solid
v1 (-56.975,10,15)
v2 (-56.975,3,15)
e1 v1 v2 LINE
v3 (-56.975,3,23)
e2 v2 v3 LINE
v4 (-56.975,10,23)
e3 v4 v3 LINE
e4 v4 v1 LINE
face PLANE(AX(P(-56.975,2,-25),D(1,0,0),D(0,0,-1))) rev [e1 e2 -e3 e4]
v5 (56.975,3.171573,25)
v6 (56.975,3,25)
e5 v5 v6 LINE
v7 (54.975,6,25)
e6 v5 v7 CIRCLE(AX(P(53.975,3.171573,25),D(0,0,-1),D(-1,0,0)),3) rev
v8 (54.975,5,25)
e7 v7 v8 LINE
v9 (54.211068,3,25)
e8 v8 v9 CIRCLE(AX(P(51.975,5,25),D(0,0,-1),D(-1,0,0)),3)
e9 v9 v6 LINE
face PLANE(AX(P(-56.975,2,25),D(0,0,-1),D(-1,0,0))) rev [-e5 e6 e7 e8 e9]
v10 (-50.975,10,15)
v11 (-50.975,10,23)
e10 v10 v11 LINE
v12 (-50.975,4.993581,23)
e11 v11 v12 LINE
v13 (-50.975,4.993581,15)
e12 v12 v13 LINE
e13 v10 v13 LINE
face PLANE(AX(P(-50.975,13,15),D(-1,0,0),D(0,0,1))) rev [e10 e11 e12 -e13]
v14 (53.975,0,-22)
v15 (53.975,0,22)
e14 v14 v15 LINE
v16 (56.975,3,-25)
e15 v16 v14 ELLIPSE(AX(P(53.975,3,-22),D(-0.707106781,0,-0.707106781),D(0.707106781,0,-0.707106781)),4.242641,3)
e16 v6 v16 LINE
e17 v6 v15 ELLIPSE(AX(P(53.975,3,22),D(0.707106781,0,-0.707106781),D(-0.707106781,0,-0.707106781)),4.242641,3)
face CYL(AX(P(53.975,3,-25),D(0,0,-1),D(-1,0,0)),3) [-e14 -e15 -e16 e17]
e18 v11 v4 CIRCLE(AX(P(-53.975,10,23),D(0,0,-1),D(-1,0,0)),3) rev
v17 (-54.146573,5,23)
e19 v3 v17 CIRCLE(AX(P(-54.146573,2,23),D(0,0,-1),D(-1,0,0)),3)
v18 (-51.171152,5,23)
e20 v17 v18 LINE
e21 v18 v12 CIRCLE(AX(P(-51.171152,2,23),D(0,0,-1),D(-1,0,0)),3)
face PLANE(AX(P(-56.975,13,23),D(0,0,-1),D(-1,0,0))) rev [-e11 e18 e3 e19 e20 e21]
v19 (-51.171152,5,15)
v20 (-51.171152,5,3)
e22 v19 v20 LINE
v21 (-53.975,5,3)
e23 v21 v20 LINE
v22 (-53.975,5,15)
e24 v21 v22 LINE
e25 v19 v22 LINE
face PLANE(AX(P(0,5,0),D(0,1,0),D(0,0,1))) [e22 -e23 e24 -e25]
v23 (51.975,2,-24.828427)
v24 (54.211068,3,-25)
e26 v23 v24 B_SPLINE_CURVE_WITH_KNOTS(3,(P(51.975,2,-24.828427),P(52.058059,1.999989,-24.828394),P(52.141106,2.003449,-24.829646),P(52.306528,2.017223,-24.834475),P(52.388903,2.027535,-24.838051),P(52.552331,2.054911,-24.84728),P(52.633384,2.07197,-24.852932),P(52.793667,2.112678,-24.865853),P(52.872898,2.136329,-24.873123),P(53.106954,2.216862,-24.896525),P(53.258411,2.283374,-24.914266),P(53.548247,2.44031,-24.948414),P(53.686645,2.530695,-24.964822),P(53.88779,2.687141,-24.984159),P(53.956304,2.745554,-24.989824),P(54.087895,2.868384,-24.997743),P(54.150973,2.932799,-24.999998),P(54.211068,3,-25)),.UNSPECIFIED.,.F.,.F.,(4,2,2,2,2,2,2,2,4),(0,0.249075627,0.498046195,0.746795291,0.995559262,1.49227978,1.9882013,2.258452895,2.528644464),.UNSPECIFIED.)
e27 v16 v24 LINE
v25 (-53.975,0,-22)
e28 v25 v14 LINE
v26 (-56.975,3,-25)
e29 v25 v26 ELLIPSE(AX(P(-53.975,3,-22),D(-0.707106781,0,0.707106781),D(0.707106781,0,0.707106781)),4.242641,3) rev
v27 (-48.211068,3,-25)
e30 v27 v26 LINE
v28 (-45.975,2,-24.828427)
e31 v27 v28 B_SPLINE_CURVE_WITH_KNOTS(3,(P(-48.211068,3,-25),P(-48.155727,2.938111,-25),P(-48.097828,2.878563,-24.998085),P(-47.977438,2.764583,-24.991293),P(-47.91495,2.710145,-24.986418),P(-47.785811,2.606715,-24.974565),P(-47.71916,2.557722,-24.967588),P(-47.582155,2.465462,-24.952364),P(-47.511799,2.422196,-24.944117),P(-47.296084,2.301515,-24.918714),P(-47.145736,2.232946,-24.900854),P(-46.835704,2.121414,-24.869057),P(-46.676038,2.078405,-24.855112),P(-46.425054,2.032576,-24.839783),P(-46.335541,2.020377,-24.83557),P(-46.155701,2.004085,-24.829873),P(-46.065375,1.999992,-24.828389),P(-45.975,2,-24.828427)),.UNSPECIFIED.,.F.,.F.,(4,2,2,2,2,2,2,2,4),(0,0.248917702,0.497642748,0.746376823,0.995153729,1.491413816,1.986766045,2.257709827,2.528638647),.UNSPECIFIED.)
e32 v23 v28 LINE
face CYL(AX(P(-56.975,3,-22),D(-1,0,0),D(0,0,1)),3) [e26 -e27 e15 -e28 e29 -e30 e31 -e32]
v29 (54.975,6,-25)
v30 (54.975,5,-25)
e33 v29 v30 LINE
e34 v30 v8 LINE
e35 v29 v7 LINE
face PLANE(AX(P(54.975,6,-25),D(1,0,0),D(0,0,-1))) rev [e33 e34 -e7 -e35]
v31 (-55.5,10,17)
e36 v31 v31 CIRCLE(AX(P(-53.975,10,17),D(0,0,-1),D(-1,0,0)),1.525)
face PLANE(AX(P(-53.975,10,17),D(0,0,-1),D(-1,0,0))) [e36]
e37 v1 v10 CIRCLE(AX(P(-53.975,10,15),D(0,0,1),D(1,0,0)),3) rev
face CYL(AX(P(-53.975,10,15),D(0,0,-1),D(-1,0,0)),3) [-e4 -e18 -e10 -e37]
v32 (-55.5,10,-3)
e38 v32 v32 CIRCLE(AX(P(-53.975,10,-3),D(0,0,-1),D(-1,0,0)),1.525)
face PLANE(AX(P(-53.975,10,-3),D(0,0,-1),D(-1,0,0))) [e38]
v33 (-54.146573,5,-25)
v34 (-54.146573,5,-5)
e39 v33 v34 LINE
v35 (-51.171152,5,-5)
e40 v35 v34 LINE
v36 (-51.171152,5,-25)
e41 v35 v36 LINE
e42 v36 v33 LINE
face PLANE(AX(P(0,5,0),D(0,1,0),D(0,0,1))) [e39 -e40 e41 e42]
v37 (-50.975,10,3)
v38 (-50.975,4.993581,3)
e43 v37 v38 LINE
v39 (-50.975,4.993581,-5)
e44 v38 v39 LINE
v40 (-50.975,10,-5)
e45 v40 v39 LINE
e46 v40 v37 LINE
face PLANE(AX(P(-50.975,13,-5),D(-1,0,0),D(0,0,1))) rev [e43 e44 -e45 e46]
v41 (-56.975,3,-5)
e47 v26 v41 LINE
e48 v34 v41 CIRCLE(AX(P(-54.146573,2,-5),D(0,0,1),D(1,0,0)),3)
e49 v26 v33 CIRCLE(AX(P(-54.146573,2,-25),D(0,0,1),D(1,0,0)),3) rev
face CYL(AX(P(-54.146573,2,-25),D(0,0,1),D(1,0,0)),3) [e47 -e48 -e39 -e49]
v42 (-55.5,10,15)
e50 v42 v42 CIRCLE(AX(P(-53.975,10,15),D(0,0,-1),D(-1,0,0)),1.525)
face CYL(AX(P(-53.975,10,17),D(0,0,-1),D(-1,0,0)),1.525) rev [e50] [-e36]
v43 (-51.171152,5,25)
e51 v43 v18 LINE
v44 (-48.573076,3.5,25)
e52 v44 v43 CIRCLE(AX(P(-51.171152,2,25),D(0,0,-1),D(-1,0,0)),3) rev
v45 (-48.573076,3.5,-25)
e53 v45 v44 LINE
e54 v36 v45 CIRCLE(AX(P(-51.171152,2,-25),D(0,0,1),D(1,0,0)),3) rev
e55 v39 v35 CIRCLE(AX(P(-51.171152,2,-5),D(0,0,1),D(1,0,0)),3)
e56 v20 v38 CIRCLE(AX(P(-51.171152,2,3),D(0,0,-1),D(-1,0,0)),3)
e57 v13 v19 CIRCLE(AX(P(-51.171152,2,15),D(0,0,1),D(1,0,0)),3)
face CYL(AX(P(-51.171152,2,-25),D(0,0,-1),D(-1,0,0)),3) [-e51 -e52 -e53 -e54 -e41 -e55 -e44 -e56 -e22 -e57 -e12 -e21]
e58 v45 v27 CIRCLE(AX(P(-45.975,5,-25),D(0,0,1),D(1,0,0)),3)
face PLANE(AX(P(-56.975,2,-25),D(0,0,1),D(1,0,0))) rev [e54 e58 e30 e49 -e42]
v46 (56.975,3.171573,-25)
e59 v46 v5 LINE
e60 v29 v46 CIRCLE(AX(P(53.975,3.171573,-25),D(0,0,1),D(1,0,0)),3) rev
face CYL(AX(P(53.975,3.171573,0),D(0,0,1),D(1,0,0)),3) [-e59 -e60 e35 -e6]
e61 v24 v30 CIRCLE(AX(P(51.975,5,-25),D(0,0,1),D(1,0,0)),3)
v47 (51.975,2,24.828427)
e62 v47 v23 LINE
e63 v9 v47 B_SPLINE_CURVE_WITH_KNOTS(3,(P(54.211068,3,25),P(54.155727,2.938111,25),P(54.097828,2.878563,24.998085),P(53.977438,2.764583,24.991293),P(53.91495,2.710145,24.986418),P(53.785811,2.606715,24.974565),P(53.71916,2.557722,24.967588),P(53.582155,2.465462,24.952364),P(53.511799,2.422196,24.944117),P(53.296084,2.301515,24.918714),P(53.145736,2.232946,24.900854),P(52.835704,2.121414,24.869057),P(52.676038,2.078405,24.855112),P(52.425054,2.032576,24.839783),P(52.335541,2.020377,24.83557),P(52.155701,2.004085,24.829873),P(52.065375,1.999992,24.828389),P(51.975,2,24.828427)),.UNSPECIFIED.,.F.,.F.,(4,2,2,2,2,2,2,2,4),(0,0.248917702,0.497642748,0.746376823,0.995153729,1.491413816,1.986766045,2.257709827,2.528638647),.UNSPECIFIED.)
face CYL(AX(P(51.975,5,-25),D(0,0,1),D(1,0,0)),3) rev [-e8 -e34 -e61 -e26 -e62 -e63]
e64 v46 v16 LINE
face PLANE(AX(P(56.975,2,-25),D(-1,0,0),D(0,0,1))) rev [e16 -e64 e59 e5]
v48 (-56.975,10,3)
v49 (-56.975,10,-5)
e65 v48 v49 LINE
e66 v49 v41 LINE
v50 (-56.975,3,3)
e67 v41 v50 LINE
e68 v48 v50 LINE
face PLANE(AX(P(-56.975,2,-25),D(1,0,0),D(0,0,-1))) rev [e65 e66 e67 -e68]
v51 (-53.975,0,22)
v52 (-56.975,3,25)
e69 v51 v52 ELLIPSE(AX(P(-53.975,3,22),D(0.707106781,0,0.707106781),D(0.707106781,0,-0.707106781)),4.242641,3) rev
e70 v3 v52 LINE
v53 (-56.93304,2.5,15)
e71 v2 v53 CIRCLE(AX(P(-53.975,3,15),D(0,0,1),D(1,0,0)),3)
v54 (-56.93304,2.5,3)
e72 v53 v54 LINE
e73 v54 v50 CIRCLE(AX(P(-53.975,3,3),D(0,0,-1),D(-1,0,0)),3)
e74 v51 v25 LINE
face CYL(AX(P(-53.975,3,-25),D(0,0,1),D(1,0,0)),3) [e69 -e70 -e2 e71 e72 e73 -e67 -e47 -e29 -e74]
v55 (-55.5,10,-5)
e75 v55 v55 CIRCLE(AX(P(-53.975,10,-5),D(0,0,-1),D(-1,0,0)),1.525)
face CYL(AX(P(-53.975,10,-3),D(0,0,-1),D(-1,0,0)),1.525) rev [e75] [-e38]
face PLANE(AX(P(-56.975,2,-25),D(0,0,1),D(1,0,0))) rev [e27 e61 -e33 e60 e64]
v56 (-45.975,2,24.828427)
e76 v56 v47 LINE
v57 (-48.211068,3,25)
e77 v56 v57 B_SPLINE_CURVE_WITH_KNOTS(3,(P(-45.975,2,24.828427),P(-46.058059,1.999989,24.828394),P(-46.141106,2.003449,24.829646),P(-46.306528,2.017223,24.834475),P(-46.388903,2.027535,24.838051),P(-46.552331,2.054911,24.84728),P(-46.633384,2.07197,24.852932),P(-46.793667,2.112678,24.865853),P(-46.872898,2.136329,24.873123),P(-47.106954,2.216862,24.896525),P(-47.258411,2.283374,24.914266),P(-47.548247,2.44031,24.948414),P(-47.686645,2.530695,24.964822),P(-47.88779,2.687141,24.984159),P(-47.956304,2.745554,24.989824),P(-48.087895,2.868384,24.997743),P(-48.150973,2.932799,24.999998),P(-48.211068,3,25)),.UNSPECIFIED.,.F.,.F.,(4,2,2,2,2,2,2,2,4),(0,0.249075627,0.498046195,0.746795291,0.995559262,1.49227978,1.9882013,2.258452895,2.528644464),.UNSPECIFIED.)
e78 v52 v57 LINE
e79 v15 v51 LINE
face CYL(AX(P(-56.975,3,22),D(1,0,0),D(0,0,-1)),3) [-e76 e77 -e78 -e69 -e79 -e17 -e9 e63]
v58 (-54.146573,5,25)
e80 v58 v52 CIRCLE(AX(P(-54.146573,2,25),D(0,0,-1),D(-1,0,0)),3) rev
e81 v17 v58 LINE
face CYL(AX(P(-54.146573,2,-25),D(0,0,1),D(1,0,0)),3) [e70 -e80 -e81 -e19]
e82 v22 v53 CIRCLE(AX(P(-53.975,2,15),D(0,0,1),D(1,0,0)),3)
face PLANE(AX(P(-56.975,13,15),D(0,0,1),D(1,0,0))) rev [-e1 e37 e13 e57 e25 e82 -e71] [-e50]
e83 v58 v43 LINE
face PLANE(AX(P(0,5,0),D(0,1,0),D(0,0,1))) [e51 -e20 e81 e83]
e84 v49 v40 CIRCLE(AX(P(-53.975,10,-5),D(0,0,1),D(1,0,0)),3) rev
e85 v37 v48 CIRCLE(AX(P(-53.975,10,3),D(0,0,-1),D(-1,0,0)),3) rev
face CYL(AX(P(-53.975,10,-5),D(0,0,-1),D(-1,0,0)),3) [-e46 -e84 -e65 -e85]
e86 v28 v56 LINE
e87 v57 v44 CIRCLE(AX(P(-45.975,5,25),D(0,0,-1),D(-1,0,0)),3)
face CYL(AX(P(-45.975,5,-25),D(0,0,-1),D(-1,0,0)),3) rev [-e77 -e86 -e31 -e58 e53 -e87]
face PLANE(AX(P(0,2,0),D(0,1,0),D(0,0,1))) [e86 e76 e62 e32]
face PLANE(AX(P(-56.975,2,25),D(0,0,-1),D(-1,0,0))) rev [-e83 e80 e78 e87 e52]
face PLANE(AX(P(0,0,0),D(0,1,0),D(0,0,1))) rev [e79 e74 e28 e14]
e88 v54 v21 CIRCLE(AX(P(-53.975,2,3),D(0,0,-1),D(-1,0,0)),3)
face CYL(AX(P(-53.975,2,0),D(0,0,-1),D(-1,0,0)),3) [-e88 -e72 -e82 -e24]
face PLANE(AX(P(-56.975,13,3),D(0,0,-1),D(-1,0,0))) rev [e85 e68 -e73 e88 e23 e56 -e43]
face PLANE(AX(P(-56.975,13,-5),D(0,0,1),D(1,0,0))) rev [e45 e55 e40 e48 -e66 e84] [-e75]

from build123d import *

# Parameters (mm, degrees)
SKETCH1_W                     = 113.95
SKETCH1_H                     = 50
BOSS_EXTRUDE1_DEPTH           = 2
SKETCH2_W                     = 8
SKETCH2_H                     = 50
BOSS_EXTRUDE2_DEPTH           = 3
SKETCH3_W                     = 2
SKETCH3_H                     = 50
BOSS_EXTRUDE3_DEPTH           = 4
SKETCH7_W                     = 6
SKETCH7_H                     = 8
BOSS_EXTRUDE5_DEPTH           = 8
FILLET1_RADIUS                = 3
FILLET1_LENGTH                = 8
SKETCH10_R                    = 1.525
CUT_EXTRUDE2_DEPTH            = 2
LPATTERN2_COUNT               = 2
LPATTERN2_PITCH               = 20
FILLET1_OF_LPATTERN2_2_RADIUS = 3
FILLET1_OF_LPATTERN2_2_LENGTH = 8
FILLET2_R                     = 3
FILLET3_R                     = 3
FILLET4_START                 = -25
FILLET4_DEPTH                 = 20
FILLET4_START_2               = 3
FILLET4_2_DEPTH               = 12
FILLET4_START_3               = -19.719
FILLET4_3_DEPTH               = 44.719
FILLET4_START_4               = 23
FILLET4_4_DEPTH               = 2
FILLET5_R                     = 3


with BuildPart() as part:
    # Sketch1 → Boss-Extrude1 (new body)
    with BuildSketch(Plane(origin=(0, 0, 0), x_dir=(1, 0, 0), z_dir=(0, 1, 0))):
        Rectangle(SKETCH1_W, SKETCH1_H)
    extrude(amount=BOSS_EXTRUDE1_DEPTH)

    # Sketch2 → Boss-Extrude2 (add)
    with BuildSketch(Plane(origin=(0, 2, 0), x_dir=(1, 0, 0), z_dir=(0, 1, 0))):
        with Locations((-52.975, 0)):
            Rectangle(SKETCH2_W, SKETCH2_H)
    extrude(amount=BOSS_EXTRUDE2_DEPTH)

    # Sketch3 → Boss-Extrude3 (add)
    with BuildSketch(Plane(origin=(0, 2, 0), x_dir=(1, 0, 0), z_dir=(0, 1, 0))):
        with Locations((55.975, 0)):
            Rectangle(SKETCH3_W, SKETCH3_H)
    extrude(amount=BOSS_EXTRUDE3_DEPTH)

    # Sketch7 → Boss-Extrude5 (add)
    with BuildSketch(Plane(origin=(0, 5, 0), x_dir=(1, 0, 0), z_dir=(0, 1, 0))):
        with Locations((-53.975, 1)):
            Rectangle(SKETCH7_W, SKETCH7_H)
    boss_extrude5 = extrude(amount=BOSS_EXTRUDE5_DEPTH)

    # Fillet1: full round fillet: the end face becomes a half cylinder, R = half its width
    fillet1_face = Plane((-53.975, 13, -1), x_dir=(0, 0, 1), z_dir=(0, 1, 0))  # on the end face: x along it, z out of the body
    fillet1_slab = fillet1_face.offset(-FILLET1_RADIUS / 2) * Box(FILLET1_LENGTH, 2 * FILLET1_RADIUS, FILLET1_RADIUS, mode=Mode.PRIVATE)  # the body's end, R deep
    fillet1_round = Plane((-53.975, 10, -1), x_dir=(0, 1, 0), z_dir=(0, 0, 1)) * Cylinder(FILLET1_RADIUS, FILLET1_LENGTH, mode=Mode.PRIVATE)  # its axis R under the face
    add(fillet1_slab - fillet1_round, mode=Mode.SUBTRACT)

    # Sketch10 → Cut-Extrude2 (cut)
    with BuildSketch(Plane(origin=(0, 0, -5), x_dir=(-1, 0, 0), z_dir=(0, 0, -1))):
        with Locations((53.975, 10)):
            Circle(SKETCH10_R)
    cut_extrude2 = extrude(amount=-CUT_EXTRUDE2_DEPTH, mode=Mode.SUBTRACT)

    # LPattern2: Boss-Extrude5, Cut-Extrude2 ×2
    with Locations(*[(0, 0, i * LPATTERN2_PITCH) for i in range(1, LPATTERN2_COUNT)]):
        add(boss_extrude5)
        add(cut_extrude2, mode=Mode.SUBTRACT)

    # Fillet1 of LPattern2 2: full round fillet: the end face becomes a half cylinder, R = half its width
    fillet1_of_lpattern2_2_face = Plane((-53.975, 13, 19), x_dir=(0, 0, 1), z_dir=(0, 1, 0))  # on the end face: x along it, z out of the body
    fillet1_of_lpattern2_2_slab = fillet1_of_lpattern2_2_face.offset(-FILLET1_OF_LPATTERN2_2_RADIUS / 2) * Box(FILLET1_OF_LPATTERN2_2_LENGTH, 2 * FILLET1_OF_LPATTERN2_2_RADIUS, FILLET1_OF_LPATTERN2_2_RADIUS, mode=Mode.PRIVATE)  # the body's end, R deep
    fillet1_of_lpattern2_2_round = Plane((-53.975, 10, 19), x_dir=(0, 1, 0), z_dir=(0, 0, 1)) * Cylinder(FILLET1_OF_LPATTERN2_2_RADIUS, FILLET1_OF_LPATTERN2_2_LENGTH, mode=Mode.PRIVATE)  # its axis R under the face
    add(fillet1_of_lpattern2_2_slab - fillet1_of_lpattern2_2_round, mode=Mode.SUBTRACT)

    # Fillet2
    # the kernel refuses this fillet: 3 mm, written as the material it takes off along each edge
    with BuildSketch(Plane(origin=(-64.475, 0, -25), x_dir=(0, 1, 0), z_dir=(1, 0, 0))) as fillet2_piece_1:
        with BuildLine():
            CenterArc((FILLET2_R, FILLET2_R), FILLET2_R, 180, 90)
            Line((0, FILLET2_R), (0, 0))
            Line((0, 0), (FILLET2_R, 0))
        make_face()
    extrude(amount=128.95, mode=Mode.SUBTRACT)
    with BuildSketch(Plane(origin=(-56.975, 0, 32.5), x_dir=(1, 0, 0), z_dir=(0, 0, -1)), Plane(origin=(56.975, 0, -32.5), x_dir=(-1, 0, 0), z_dir=(0, 0, 1))) as fillet2_piece_2:
        with BuildLine():
            CenterArc((FILLET2_R, -FILLET2_R), FILLET2_R, 90, 90)
            Line((0, -FILLET2_R), (0, 0))
            Line((0, 0), (FILLET2_R, 0))
        make_face()
    extrude(amount=65, mode=Mode.SUBTRACT)
    with BuildSketch(Plane(origin=(64.475, 0, 25), x_dir=(0, 0, -1), z_dir=(-1, 0, 0))) as fillet2_piece_3:
        with BuildLine():
            CenterArc((FILLET2_R, -FILLET2_R), FILLET2_R, 90, 90)
            Line((0, -FILLET2_R), (0, 0))
            Line((0, 0), (FILLET2_R, 0))
        make_face()
    extrude(amount=128.95, mode=Mode.SUBTRACT)

    # Fillet3
    fillet3_edges = [part.edges().sort_by_distance(p)[0] for p in [
        (-48.975, 2, 0),
        (54.975, 2, 0),
    ]]
    fillet(fillet3_edges, radius=FILLET3_R - 0.0001)  # a hair under: the kernel refuses the full size

    # Fillet4: read off the stored shape, not the designer's step
    # Fillet4 outline → Fillet4 (cut)
    with BuildSketch(Plane.XY.offset(FILLET4_START)):
        with BuildLine():
            ThreePointArc((-51.171152423, 5), (-49.671152423, 4.598076211), (-48.573076211, 3.5))
            ThreePointArc((-48.573076211, 3.5), (-48.872777479, 4.223542864), (-48.975, 5))
            Line((-48.975, 5), (-51.171152423, 5))
        make_face()
        with BuildLine():
            ThreePointArc((-56.975, 3), (-55.878623683, 4.449489743), (-54.146572875, 5))
            Line((-54.146572875, 5), (-56.975, 5))
            Line((-56.975, 5), (-56.975, 3))
        make_face()
    extrude(amount=FILLET4_DEPTH, mode=Mode.SUBTRACT)

    # Fillet4 2 outline → Fillet4 2 (cut)
    with BuildSketch(Plane.XY.offset(FILLET4_START_2)):
        with BuildLine():
            Line((-53.975, 5), (-56.975, 5))
            Line((-56.975, 5), (-56.975, 3))
            ThreePointArc((-56.975, 3), (-56.964491568, 2.749121219), (-56.933039892, 2.5))
            ThreePointArc((-56.933039892, 2.5), (-55.911491673, 4.291287847), (-53.975, 5))
        make_face()
        with BuildLine():
            ThreePointArc((-51.171152423, 5), (-49.671152423, 4.598076211), (-48.573076211, 3.5))
            ThreePointArc((-48.573076211, 3.5), (-48.872777479, 4.223542864), (-48.975, 5))
            Line((-48.975, 5), (-51.171152423, 5))
        make_face()
    extrude(amount=FILLET4_2_DEPTH, mode=Mode.SUBTRACT)

    # Fillet4 3 outline → Fillet4 3 (cut)
    with BuildSketch(Plane.XY.offset(FILLET4_START_3)):
        with BuildLine():
            Line((-50.975, 5), (-50.975, 4.993580503))
            ThreePointArc((-50.975, 4.993580503), (-49.58697311, 4.547621617), (-48.573076211, 3.5))
            ThreePointArc((-48.573076211, 3.5), (-48.872777479, 4.223542864), (-48.975, 5))
            Line((-48.975, 5), (-50.975, 5))
        make_face()
    extrude(amount=FILLET4_3_DEPTH, mode=Mode.SUBTRACT)

    # Fillet4 4 outline → Fillet4 4 (cut)
    with BuildSketch(Plane.XY.offset(FILLET4_START_4)):
        with BuildLine():
            Line((-50.975, 5), (-51.171152423, 5))
            ThreePointArc((-51.171152423, 5), (-51.073023703, 4.998394696), (-50.975, 4.993580503))
            Line((-50.975, 4.993580503), (-50.975, 5))
        make_face()
        with BuildLine():
            ThreePointArc((-56.975, 3), (-55.878623683, 4.449489743), (-54.146572875, 5))
            Line((-54.146572875, 5), (-56.975, 5))
            Line((-56.975, 5), (-56.975, 3))
        make_face()
    extrude(amount=FILLET4_4_DEPTH, mode=Mode.SUBTRACT)

    # Fillet5
    # the kernel refuses this fillet: 3 mm, written as the material it takes off along each edge
    with BuildSketch(Plane(origin=(56.975, 6, 32.071067812), x_dir=(0, -1, 0), z_dir=(0, 0, -1))) as fillet5_piece_1:
        with BuildLine():
            CenterArc((2.828427125, 3), FILLET5_R, 199.471220634, 70.528779366)
            Line((0, 2), (-0.056568542, 1.98))
            ThreePointArc((-0.056568542, 1.98), (-0.06, 1), (-0.06, 0))
            Line((-0.06, 0), (0, -0.06))
            Line((0, -0.06), (2.828427125, -0.06))
            Line((2.828427125, -0.06), (2.828427125, 0))
        make_face()
    extrude(amount=64.142135624, mode=Mode.SUBTRACT)


solid = part.part
